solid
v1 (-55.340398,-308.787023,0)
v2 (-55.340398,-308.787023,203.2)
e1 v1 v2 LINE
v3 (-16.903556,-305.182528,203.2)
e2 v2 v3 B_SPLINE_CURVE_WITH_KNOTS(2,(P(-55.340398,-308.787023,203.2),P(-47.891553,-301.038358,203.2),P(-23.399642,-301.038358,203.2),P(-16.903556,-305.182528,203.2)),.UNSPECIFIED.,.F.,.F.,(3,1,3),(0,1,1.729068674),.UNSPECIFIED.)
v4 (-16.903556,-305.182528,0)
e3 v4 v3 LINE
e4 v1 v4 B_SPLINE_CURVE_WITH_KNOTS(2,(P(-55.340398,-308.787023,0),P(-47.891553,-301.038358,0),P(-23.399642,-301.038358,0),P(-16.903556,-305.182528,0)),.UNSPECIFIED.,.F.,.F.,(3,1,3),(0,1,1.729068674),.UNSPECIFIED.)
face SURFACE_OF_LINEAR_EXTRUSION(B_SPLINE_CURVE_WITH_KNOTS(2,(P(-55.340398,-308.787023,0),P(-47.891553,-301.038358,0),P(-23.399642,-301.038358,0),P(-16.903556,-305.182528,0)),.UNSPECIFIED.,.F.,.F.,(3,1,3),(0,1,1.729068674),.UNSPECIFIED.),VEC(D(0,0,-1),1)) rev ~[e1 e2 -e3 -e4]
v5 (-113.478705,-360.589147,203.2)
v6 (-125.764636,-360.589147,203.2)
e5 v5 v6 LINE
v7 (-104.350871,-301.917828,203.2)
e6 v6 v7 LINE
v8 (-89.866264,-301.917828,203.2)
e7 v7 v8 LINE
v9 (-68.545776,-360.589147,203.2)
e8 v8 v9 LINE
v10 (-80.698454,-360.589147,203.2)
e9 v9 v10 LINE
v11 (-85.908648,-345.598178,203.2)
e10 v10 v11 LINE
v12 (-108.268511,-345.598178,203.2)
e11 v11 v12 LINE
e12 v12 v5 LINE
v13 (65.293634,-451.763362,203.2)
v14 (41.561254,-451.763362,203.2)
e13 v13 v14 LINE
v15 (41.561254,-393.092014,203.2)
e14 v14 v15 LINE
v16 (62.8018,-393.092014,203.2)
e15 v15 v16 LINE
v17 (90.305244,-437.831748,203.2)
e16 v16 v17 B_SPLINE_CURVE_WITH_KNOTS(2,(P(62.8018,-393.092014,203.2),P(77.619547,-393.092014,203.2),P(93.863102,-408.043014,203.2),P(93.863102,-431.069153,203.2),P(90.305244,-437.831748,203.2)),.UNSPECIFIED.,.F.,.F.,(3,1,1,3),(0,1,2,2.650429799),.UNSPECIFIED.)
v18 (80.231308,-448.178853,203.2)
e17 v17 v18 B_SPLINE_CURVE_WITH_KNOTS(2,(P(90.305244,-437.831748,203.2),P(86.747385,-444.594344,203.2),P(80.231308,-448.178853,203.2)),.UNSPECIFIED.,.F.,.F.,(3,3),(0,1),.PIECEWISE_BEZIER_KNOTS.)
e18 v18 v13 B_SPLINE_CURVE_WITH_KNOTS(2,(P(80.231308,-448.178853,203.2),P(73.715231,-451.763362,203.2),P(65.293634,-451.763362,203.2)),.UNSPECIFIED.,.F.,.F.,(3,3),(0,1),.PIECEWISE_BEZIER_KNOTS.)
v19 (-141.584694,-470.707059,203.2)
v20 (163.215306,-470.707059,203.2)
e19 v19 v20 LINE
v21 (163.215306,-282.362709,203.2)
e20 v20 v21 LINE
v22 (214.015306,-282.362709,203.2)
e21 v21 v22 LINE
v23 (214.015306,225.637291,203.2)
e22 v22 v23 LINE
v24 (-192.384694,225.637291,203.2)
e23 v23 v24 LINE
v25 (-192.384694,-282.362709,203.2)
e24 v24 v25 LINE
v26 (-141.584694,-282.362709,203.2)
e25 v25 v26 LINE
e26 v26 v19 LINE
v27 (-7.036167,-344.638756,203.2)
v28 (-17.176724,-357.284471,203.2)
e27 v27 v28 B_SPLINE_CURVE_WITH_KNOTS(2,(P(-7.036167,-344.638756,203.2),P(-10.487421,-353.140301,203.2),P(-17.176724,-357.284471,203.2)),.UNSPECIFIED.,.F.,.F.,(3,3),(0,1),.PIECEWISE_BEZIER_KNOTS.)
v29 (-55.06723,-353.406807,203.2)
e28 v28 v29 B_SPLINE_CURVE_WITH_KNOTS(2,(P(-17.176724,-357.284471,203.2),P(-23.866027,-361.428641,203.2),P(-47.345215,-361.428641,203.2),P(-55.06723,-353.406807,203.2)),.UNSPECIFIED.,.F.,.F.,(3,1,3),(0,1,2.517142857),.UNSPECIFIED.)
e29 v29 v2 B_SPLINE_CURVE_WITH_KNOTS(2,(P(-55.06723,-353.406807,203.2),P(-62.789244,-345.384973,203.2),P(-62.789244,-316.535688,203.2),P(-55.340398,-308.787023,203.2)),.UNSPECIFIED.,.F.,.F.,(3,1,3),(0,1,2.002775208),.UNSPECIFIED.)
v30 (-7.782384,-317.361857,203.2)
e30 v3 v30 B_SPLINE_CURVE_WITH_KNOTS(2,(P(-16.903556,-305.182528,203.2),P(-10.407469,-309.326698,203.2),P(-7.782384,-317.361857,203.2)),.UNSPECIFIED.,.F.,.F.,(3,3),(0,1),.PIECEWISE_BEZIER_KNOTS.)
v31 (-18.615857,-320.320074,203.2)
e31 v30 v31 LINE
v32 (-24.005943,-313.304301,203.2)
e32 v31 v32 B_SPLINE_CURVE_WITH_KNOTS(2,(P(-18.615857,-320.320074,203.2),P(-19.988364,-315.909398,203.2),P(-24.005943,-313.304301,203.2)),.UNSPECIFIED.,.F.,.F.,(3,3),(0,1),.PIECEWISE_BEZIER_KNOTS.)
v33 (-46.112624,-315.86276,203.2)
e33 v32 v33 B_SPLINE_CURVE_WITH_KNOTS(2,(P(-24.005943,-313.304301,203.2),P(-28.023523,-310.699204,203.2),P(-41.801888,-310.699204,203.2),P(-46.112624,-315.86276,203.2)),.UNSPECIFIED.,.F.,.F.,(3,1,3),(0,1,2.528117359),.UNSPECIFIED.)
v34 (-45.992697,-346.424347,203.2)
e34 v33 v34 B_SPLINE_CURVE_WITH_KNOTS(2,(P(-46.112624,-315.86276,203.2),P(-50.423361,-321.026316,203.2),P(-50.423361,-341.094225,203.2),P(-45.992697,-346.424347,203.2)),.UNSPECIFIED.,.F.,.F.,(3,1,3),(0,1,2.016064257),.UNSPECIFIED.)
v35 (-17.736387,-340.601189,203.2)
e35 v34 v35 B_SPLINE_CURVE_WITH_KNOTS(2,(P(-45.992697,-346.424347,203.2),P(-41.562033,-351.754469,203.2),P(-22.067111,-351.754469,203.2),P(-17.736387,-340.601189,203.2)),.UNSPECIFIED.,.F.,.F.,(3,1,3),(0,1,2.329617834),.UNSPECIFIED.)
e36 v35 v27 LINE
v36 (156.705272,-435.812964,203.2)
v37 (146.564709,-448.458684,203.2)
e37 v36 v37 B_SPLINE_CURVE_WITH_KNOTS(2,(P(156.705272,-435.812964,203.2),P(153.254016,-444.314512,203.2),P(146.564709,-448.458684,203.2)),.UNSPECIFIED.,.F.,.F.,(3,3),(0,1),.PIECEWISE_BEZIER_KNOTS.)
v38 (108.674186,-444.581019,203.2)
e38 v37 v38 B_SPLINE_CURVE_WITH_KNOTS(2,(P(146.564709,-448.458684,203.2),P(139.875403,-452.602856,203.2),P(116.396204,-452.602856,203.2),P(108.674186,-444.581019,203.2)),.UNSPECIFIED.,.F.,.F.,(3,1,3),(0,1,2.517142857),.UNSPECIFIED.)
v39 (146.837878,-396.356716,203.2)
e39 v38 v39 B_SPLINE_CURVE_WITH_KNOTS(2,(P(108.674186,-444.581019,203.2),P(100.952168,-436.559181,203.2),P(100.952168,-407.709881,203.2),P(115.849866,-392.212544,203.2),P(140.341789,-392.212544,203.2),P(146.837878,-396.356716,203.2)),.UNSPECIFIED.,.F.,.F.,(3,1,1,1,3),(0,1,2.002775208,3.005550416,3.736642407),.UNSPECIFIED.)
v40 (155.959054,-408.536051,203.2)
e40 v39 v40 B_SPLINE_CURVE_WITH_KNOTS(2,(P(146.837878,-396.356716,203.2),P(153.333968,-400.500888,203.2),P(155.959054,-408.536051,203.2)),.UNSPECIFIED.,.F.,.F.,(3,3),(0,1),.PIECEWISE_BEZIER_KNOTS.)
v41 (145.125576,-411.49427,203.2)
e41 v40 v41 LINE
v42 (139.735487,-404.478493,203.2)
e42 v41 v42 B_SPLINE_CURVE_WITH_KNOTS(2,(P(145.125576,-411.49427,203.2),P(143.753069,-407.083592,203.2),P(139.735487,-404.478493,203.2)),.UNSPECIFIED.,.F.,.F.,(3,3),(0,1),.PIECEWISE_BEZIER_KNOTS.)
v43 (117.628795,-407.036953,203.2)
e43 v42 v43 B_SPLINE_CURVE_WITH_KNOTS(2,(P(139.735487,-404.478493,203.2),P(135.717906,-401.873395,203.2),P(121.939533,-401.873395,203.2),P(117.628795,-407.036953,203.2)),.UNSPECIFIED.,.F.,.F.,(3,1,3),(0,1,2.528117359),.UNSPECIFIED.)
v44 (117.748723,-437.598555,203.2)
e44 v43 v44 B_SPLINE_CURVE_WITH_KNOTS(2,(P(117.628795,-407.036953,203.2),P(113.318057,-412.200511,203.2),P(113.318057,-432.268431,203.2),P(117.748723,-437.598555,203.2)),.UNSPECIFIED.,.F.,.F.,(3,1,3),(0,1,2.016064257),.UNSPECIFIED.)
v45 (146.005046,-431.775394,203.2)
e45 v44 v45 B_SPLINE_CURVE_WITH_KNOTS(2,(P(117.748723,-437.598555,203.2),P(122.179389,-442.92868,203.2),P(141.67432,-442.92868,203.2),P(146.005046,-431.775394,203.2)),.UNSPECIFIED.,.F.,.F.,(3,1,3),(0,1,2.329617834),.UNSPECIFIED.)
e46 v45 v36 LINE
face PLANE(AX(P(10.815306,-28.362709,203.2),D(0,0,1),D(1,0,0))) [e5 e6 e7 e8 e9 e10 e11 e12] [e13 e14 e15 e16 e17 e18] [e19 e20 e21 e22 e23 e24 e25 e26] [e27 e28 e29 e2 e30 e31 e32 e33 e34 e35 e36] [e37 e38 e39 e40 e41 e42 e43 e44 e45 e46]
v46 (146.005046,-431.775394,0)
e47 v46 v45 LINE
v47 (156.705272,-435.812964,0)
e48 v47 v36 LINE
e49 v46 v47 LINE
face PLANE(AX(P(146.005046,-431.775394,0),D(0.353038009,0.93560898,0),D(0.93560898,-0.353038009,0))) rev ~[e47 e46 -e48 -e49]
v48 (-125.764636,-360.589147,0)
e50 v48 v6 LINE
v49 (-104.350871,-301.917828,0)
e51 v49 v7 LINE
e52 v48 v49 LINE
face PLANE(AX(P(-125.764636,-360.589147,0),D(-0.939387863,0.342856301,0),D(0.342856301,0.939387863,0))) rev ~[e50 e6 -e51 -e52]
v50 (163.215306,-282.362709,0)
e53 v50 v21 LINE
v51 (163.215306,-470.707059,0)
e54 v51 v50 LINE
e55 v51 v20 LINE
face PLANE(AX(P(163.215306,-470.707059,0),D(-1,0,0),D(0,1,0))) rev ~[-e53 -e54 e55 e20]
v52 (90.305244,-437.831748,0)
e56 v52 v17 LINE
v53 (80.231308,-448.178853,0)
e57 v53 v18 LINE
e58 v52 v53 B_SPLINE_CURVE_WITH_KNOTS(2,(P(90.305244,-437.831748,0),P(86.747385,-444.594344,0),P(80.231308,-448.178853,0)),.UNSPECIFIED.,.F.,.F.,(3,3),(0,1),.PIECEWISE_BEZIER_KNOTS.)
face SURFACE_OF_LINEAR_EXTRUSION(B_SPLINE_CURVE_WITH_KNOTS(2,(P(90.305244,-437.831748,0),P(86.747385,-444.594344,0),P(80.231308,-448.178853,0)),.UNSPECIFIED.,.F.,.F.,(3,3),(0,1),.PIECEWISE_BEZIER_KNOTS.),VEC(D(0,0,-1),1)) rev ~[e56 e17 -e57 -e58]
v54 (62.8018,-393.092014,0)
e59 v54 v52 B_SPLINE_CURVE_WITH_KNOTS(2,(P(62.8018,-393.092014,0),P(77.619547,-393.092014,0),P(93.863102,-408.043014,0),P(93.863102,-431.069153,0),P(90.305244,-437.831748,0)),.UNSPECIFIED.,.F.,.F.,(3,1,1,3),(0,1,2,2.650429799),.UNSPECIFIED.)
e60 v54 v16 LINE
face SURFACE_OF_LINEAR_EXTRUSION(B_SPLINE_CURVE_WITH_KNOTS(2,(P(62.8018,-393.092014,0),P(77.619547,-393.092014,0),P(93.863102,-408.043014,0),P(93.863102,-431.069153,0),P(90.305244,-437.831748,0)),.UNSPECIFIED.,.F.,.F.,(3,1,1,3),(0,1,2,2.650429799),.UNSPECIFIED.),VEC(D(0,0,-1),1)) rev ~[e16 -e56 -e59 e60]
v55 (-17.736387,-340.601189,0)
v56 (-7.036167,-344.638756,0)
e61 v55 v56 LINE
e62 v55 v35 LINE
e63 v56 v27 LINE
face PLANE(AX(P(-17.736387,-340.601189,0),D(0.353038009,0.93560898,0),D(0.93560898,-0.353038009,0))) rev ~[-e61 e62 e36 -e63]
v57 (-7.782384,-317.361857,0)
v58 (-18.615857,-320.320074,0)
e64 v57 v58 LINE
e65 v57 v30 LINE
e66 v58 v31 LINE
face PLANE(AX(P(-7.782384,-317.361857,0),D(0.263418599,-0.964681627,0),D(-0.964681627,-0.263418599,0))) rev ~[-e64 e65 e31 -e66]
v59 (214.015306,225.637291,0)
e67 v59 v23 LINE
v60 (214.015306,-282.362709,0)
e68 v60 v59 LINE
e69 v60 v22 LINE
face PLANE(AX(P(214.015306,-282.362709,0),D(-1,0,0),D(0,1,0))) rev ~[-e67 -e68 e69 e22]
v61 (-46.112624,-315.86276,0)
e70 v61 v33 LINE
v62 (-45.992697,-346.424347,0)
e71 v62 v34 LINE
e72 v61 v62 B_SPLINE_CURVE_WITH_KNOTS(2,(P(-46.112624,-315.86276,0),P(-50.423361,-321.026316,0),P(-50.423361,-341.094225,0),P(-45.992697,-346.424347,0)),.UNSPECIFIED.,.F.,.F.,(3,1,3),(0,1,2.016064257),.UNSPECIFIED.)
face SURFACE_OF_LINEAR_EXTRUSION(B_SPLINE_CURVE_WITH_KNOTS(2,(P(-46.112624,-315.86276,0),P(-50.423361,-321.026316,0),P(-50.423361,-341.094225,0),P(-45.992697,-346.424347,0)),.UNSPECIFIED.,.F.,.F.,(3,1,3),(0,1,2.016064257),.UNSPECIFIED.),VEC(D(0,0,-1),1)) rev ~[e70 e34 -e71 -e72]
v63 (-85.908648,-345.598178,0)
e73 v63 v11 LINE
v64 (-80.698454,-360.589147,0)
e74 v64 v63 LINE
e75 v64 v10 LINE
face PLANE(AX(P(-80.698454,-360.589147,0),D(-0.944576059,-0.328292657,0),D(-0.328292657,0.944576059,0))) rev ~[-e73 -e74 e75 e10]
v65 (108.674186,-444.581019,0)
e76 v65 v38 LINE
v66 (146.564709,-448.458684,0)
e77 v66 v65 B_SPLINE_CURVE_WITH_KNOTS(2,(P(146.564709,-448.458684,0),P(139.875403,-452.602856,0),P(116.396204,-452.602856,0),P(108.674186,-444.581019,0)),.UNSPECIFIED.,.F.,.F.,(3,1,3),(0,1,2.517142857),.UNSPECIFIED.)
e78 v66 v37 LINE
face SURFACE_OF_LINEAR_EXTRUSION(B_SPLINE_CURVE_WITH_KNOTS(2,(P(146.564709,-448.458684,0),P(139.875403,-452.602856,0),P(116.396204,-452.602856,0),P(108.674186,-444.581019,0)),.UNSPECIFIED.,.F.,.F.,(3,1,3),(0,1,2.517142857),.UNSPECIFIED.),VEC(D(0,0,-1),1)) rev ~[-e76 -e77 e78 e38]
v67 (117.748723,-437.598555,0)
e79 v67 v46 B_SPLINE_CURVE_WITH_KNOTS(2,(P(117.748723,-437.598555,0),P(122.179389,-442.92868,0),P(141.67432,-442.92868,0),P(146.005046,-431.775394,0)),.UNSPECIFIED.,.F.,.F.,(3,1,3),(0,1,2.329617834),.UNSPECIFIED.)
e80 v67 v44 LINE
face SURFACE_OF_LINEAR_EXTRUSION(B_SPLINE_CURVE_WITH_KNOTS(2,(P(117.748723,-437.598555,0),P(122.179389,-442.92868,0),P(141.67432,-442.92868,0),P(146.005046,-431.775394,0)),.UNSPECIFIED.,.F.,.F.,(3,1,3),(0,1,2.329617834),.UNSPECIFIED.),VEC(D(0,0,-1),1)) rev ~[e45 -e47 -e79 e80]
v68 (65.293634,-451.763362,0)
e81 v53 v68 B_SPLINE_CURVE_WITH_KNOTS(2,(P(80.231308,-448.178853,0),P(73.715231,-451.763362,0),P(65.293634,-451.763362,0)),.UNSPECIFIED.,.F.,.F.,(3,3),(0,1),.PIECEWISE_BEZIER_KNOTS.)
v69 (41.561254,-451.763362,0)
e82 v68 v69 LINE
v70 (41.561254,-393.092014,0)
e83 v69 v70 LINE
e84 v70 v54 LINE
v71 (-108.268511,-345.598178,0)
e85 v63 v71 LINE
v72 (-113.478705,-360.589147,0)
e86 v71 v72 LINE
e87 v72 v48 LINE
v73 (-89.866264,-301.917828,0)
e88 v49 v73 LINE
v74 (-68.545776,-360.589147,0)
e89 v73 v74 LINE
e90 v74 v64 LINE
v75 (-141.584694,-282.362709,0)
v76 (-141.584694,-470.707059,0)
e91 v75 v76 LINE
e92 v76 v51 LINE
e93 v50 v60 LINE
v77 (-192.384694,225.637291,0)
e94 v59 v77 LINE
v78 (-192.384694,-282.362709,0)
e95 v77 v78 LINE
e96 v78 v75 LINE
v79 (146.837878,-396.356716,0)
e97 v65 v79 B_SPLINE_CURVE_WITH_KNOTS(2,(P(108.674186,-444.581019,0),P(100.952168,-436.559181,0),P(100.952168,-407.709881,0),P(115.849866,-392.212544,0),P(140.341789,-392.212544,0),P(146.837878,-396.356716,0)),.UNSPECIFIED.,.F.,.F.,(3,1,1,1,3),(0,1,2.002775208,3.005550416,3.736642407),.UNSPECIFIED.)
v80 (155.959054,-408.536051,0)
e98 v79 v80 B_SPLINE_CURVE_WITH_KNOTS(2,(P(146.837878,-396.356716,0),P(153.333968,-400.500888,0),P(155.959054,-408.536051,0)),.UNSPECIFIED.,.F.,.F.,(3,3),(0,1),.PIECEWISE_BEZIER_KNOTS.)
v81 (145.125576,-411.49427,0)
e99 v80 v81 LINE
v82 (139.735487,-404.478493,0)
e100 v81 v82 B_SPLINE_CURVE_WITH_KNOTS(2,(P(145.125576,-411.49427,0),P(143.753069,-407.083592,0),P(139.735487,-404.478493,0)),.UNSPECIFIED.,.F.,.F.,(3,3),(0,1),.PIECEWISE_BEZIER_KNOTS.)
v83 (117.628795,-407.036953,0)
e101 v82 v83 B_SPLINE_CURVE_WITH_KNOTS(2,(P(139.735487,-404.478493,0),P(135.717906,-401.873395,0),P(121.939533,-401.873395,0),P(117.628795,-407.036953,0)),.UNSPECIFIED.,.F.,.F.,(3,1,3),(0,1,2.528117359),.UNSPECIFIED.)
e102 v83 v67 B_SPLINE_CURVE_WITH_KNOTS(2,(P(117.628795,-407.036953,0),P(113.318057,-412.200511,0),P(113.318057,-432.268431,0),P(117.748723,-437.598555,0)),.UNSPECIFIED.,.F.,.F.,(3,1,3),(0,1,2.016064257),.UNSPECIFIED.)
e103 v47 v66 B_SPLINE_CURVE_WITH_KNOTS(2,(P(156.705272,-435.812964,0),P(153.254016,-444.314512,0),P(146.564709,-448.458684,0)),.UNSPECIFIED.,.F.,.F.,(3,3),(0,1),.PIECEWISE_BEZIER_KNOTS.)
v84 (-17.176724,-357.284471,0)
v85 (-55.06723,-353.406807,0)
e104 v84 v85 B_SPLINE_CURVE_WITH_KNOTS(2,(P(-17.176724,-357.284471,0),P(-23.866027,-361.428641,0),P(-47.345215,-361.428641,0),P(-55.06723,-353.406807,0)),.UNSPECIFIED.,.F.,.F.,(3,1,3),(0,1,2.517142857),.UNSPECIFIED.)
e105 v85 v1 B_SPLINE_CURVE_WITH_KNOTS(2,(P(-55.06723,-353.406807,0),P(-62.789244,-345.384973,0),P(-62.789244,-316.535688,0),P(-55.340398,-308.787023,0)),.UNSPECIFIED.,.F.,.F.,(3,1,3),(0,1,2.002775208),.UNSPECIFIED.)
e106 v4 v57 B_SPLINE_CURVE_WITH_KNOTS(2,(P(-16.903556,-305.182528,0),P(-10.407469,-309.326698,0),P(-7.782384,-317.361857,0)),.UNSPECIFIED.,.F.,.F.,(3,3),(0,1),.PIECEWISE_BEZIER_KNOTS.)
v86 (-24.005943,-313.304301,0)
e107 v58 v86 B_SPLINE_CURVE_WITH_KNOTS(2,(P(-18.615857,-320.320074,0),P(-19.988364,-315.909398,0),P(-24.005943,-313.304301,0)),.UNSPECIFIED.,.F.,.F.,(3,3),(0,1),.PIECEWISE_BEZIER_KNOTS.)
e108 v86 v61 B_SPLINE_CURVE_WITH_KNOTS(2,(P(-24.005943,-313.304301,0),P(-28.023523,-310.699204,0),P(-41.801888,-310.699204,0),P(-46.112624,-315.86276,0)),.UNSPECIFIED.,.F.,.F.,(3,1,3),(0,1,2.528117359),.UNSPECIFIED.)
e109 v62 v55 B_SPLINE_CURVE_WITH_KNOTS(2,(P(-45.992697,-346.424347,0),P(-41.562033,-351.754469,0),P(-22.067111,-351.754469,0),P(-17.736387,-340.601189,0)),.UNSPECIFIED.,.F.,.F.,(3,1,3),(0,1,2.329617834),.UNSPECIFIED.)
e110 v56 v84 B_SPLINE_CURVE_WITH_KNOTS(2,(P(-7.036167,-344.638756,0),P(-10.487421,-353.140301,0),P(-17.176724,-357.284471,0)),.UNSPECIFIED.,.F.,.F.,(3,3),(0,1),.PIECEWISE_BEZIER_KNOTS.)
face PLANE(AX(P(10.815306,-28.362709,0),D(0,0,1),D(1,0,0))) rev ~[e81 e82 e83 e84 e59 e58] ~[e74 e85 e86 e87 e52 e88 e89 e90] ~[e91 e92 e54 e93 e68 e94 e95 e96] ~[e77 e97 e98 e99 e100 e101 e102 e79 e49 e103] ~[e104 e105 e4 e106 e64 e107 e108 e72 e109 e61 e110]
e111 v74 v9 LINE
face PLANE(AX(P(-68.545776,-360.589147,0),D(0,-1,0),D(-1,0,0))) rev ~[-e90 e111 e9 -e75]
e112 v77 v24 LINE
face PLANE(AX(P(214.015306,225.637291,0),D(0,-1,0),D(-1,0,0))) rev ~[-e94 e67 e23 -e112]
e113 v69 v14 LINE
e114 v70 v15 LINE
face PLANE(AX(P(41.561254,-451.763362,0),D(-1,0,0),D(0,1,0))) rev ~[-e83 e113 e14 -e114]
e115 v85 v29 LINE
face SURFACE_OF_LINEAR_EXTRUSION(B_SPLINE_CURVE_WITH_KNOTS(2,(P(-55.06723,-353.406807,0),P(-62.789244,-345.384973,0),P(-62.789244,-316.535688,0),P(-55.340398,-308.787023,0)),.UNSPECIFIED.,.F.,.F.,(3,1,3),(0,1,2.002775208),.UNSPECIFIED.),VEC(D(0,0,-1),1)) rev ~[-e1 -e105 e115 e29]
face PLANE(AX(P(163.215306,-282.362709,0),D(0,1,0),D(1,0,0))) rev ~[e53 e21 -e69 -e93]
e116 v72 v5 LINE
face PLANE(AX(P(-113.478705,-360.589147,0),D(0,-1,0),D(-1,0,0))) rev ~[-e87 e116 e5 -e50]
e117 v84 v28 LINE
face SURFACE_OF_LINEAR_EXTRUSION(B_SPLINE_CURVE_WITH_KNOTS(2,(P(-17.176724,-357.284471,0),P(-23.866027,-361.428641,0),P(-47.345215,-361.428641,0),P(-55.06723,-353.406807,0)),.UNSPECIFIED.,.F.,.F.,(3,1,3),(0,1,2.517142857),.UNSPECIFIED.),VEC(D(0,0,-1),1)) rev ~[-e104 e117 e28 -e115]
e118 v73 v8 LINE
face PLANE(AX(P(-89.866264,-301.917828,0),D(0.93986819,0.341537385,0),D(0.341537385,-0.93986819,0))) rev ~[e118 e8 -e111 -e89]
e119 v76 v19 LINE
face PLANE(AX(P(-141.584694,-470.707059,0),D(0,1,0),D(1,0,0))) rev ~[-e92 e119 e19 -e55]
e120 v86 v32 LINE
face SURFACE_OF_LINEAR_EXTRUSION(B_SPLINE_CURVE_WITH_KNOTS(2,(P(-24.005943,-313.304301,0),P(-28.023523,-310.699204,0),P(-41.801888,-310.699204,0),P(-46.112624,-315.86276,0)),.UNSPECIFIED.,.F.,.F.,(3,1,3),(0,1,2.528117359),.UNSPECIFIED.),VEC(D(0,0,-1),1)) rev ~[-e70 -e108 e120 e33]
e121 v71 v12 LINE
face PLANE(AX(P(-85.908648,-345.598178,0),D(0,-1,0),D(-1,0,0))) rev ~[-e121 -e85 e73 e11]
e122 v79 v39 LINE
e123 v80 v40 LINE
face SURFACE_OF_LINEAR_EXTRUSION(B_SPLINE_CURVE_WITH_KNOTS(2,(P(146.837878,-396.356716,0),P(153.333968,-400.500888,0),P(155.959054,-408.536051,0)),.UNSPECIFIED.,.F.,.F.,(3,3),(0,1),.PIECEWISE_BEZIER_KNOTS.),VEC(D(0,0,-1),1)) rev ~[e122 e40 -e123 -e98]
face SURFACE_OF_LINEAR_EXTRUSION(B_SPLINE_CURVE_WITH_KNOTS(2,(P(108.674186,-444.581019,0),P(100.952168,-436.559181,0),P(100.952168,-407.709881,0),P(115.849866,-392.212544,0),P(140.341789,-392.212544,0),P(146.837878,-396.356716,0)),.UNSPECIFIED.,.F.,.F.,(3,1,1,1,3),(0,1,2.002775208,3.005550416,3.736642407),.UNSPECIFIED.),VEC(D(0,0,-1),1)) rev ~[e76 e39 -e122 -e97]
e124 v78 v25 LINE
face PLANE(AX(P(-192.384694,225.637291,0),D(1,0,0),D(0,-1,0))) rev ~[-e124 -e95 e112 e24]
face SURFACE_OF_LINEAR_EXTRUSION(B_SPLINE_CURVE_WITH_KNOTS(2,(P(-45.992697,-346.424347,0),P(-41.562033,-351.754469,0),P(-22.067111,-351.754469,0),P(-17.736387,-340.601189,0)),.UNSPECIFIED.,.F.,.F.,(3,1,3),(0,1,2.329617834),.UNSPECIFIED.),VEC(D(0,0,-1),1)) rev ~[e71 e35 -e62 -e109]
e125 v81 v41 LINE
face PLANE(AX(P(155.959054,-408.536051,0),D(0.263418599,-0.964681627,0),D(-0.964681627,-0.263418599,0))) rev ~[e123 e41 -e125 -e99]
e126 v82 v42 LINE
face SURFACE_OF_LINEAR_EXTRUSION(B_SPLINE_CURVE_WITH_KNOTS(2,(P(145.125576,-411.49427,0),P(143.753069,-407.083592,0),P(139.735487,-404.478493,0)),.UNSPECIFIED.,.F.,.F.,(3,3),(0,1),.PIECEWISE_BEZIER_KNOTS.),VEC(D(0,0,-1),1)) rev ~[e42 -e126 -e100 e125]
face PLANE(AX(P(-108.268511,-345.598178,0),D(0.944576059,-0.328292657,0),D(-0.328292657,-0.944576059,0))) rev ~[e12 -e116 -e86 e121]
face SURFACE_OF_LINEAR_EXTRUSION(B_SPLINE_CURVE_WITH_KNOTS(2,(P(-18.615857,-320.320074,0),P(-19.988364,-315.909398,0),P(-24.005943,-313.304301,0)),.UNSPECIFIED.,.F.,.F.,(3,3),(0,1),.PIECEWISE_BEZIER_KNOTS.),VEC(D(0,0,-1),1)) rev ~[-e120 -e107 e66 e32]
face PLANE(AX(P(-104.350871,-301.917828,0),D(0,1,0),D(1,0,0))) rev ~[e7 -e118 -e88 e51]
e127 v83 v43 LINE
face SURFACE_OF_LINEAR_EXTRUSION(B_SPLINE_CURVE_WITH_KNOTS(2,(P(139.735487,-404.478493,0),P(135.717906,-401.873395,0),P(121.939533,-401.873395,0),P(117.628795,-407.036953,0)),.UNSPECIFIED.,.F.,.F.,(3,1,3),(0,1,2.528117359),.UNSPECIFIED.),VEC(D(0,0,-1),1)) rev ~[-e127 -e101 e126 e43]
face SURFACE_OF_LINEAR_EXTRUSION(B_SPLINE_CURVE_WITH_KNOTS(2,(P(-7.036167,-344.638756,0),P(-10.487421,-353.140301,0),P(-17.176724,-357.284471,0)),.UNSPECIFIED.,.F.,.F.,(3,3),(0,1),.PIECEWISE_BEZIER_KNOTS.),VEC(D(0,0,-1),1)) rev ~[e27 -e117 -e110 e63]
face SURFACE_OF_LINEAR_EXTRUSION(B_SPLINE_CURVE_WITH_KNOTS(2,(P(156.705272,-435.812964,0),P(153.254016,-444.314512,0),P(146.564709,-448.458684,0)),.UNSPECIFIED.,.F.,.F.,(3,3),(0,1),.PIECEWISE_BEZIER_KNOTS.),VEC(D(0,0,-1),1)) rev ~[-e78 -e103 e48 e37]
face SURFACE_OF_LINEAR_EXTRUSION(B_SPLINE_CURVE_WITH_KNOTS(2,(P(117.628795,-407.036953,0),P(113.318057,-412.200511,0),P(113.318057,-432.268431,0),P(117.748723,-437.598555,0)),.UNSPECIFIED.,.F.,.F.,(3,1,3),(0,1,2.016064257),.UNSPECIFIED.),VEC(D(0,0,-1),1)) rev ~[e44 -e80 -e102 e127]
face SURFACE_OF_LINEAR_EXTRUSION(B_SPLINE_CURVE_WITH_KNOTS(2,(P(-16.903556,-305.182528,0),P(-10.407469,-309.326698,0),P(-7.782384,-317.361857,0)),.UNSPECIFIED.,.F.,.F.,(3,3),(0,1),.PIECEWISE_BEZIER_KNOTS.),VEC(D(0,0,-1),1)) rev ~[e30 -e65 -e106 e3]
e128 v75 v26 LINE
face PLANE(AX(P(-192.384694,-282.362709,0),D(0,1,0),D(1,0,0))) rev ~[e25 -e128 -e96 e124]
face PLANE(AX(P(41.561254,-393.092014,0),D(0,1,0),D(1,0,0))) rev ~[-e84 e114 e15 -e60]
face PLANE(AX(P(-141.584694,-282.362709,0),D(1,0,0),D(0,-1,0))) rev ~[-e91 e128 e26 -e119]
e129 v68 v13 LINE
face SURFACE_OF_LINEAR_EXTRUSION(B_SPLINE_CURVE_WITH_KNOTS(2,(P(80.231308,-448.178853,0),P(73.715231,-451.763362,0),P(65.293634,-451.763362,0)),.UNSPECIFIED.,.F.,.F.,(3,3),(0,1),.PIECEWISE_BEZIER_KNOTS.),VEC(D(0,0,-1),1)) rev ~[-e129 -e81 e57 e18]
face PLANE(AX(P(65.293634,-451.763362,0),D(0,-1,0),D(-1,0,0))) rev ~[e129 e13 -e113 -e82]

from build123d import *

# Parameters (mm, degrees)
F1_DEPTH = 203.2


with BuildPart() as f1:
    # F0 (on Top) → F1 (new body)
    with BuildSketch(Plane.XY):
        Polygon((214.0153056353, 225.6372907119), (-192.3846943647, 225.6372907119), (-192.3846943647, -282.3627092881), (-141.5846943647, -282.3627092881), (163.2153056353, -282.3627092881), (214.0153056353, -282.3627092881), align=None)
        Polygon((163.2153056353, -282.3627092881), (-141.5846943647, -282.3627092881), (-141.5846943647, -470.7070589066), align=None)
        Polygon((-68.5457757791, -360.5891466141), (-80.6984541123, -360.5891466141), (-85.9086484415, -345.5981782754), (-108.2685105503, -345.5981782754), (-113.4787048795, -360.5891466141), (-125.7646362646, -360.5891466141), (-104.3508708244, -301.9178278628), (-89.866264083, -301.9178278628), align=None, mode=Mode.SUBTRACT)
        with BuildLine():
            add(Edge.make_bspline(
                [(-45.9926967451, -346.4243471972), (-41.5620327694, -351.7544692731), (-33.1937411102, -351.7544692731)],
                knots=[0, 0, 0, 1, 1, 1], degree=2))
            add(Edge.make_bspline(
                [(-33.1937411102, -351.7544692731), (-22.0671112766, -351.7544692731), (-17.7363870898, -340.6011888292)],
                knots=[0, 0, 0, 1, 1, 1], degree=2))
            Line((-17.7363870898, -340.6011888292), (-7.0361670223, -344.6387563017))
            add(Edge.make_bspline(
                [(-7.0361670223, -344.6387563017), (-10.4874210665, -353.1403010129), (-17.1767242718, -357.284470927)],
                knots=[0, 0, 0, 1, 1, 1], degree=2))
            add(Edge.make_bspline(
                [(-17.1767242718, -357.284470927), (-23.8660274772, -361.428640841), (-33.1937411102, -361.428640841)],
                knots=[0, 0, 0, 1, 1, 1], degree=2))
            add(Edge.make_bspline(
                [(-33.1937411102, -361.428640841), (-47.3452152219, -361.428640841), (-55.0672295794, -353.4068071167)],
                knots=[0, 0, 0, 1, 1, 1], degree=2))
            add(Edge.make_bspline(
                [(-55.0672295794, -353.4068071167), (-62.789243937, -345.3849733924), (-62.789243937, -330.980318482)],
                knots=[0, 0, 0, 1, 1, 1], degree=2))
            add(Edge.make_bspline(
                [(-62.789243937, -330.980318482), (-62.789243937, -316.5356876561), (-55.3403983358, -308.7870226882)],
                knots=[0, 0, 0, 1, 1, 1], degree=2))
            add(Edge.make_bspline(
                [(-55.3403983358, -308.7870226882), (-47.8915527347, -301.0383577202), (-33.7267533178, -301.0383577202)],
                knots=[0, 0, 0, 1, 1, 1], degree=2))
            add(Edge.make_bspline(
                [(-33.7267533178, -301.0383577202), (-23.3996417955, -301.0383577202), (-16.9035555155, -305.1825276343)],
                knots=[0, 0, 0, 1, 1, 1], degree=2))
            add(Edge.make_bspline(
                [(-16.9035555155, -305.1825276343), (-10.4074692354, -309.3266975484), (-7.7823841129, -317.3618565779)],
                knots=[0, 0, 0, 1, 1, 1], degree=2))
            Line((-7.7823841129, -317.3618565779), (-18.6158572324, -320.3200743301))
            add(Edge.make_bspline(
                [(-18.6158572324, -320.3200743301), (-19.9883636669, -315.9093983122), (-24.0059431817, -313.3043011476)],
                knots=[0, 0, 0, 1, 1, 1], degree=2))
            add(Edge.make_bspline(
                [(-24.0059431817, -313.3043011476), (-28.0235226965, -310.6992039829), (-33.4735725191, -310.6992039829)],
                knots=[0, 0, 0, 1, 1, 1], degree=2))
            add(Edge.make_bspline(
                [(-33.4735725191, -310.6992039829), (-41.8018882629, -310.6992039829), (-46.1126244918, -315.862759744)],
                knots=[0, 0, 0, 1, 1, 1], degree=2))
            add(Edge.make_bspline(
                [(-46.1126244918, -315.862759744), (-50.4233607207, -321.0263155052), (-50.4233607207, -330.980318482)],
                knots=[0, 0, 0, 1, 1, 1], degree=2))
            add(Edge.make_bspline(
                [(-50.4233607207, -330.980318482), (-50.4233607207, -341.0942251212), (-45.9926967451, -346.4243471972)],
                knots=[0, 0, 0, 1, 1, 1], degree=2))
        make_face(mode=Mode.SUBTRACT)
        Polygon((163.2153056353, -470.7070589066), (163.2153056353, -282.3627092881), (-141.5846943647, -470.7070589066), align=None)
        with BuildLine():
            add(Edge.make_bspline(
                [(85.7413243761, -400.5675143045), (93.8631018313, -408.0430141443), (93.8631018313, -421.9946154497)],
                knots=[0, 0, 0, 1, 1, 1], degree=2))
            add(Edge.make_bspline(
                [(93.8631018313, -421.9946154497), (93.8631018313, -431.0691526884), (90.3052436188, -437.8317483546)],
                knots=[0, 0, 0, 1, 1, 1], degree=2))
            add(Edge.make_bspline(
                [(90.3052436188, -437.8317483546), (86.7473854062, -444.5943440207), (80.2313080058, -448.1788528566)],
                knots=[0, 0, 0, 1, 1, 1], degree=2))
            add(Edge.make_bspline(
                [(80.2313080058, -448.1788528566), (73.7152306053, -451.7633616924), (65.2936336377, -451.7633616924)],
                knots=[0, 0, 0, 1, 1, 1], degree=2))
            Line((65.2936336377, -451.7633616924), (41.5612535758, -451.7633616924))
            Line((41.5612535758, -451.7633616924), (41.5612535758, -393.0920144647))
            Line((41.5612535758, -393.0920144647), (62.8018003578, -393.0920144647))
            add(Edge.make_bspline(
                [(62.8018003578, -393.0920144647), (77.6195469209, -393.0920144647), (85.7413243761, -400.5675143045)],
                knots=[0, 0, 0, 1, 1, 1], degree=2))
        make_face(mode=Mode.SUBTRACT)
        with BuildLine():
            add(Edge.make_bspline(
                [(117.7487229773, -437.5985554006), (122.1793891034, -442.9286800635), (130.5476848243, -442.9286800635)],
                knots=[0, 0, 0, 1, 1, 1], degree=2))
            add(Edge.make_bspline(
                [(130.5476848243, -442.9286800635), (141.6743200583, -442.9286800635), (146.0050463469, -431.7753942062)],
                knots=[0, 0, 0, 1, 1, 1], degree=2))
            Line((146.0050463469, -431.7753942062), (156.7052716079, -435.8129636385))
            add(Edge.make_bspline(
                [(156.7052716079, -435.8129636385), (153.2540158886, -444.3145124759), (146.5647094366, -448.4586844014)],
                knots=[0, 0, 0, 1, 1, 1], degree=2))
            add(Edge.make_bspline(
                [(146.5647094366, -448.4586844014), (139.8754029845, -452.6028563268), (130.5476848243, -452.6028563268)],
                knots=[0, 0, 0, 1, 1, 1], degree=2))
            add(Edge.make_bspline(
                [(130.5476848243, -452.6028563268), (116.3962038441, -452.6028563268), (108.6741857386, -444.5810187091)],
                knots=[0, 0, 0, 1, 1, 1], degree=2))
            add(Edge.make_bspline(
                [(108.6741857386, -444.5810187091), (100.9521676331, -436.5591810913), (100.9521676331, -422.1545191896)],
                knots=[0, 0, 0, 1, 1, 1], degree=2))
            add(Edge.make_bspline(
                [(100.9521676331, -422.1545191896), (100.9521676331, -407.7098813529), (108.4010168496, -399.9612126241)],
                knots=[0, 0, 0, 1, 1, 1], degree=2))
            add(Edge.make_bspline(
                [(108.4010168496, -399.9612126241), (115.8498660661, -392.2125438953), (130.014672358, -392.2125438953)],
                knots=[0, 0, 0, 1, 1, 1], degree=2))
            add(Edge.make_bspline(
                [(130.014672358, -392.2125438953), (140.3417888925, -392.2125438953), (146.8378783255, -396.3567158207)],
                knots=[0, 0, 0, 1, 1, 1], degree=2))
            add(Edge.make_bspline(
                [(146.8378783255, -396.3567158207), (153.3339677585, -400.5008877462), (155.9590541551, -408.5360506756)],
                knots=[0, 0, 0, 1, 1, 1], degree=2))
            Line((155.9590541551, -408.5360506756), (145.1255757776, -411.4942698636))
            add(Edge.make_bspline(
                [(145.1255757776, -411.4942698636), (143.7530686768, -407.083591705), (139.7354872121, -404.4784932759)],
                knots=[0, 0, 0, 1, 1, 1], degree=2))
            add(Edge.make_bspline(
                [(139.7354872121, -404.4784932759), (135.7179057474, -401.8733948469), (130.2678532795, -401.8733948469)],
                knots=[0, 0, 0, 1, 1, 1], degree=2))
            add(Edge.make_bspline(
                [(130.2678532795, -401.8733948469), (121.9395334936, -401.8733948469), (117.6287951724, -407.0369531142)],
                knots=[0, 0, 0, 1, 1, 1], degree=2))
            add(Edge.make_bspline(
                [(117.6287951724, -407.0369531142), (113.3180568512, -412.2005113814), (113.3180568512, -422.1545191896)],
                knots=[0, 0, 0, 1, 1, 1], degree=2))
            add(Edge.make_bspline(
                [(113.3180568512, -422.1545191896), (113.3180568512, -432.2684307376), (117.7487229773, -437.5985554006)],
                knots=[0, 0, 0, 1, 1, 1], degree=2))
        make_face(mode=Mode.SUBTRACT)
    extrude(amount=F1_DEPTH)


solid = f1.part
